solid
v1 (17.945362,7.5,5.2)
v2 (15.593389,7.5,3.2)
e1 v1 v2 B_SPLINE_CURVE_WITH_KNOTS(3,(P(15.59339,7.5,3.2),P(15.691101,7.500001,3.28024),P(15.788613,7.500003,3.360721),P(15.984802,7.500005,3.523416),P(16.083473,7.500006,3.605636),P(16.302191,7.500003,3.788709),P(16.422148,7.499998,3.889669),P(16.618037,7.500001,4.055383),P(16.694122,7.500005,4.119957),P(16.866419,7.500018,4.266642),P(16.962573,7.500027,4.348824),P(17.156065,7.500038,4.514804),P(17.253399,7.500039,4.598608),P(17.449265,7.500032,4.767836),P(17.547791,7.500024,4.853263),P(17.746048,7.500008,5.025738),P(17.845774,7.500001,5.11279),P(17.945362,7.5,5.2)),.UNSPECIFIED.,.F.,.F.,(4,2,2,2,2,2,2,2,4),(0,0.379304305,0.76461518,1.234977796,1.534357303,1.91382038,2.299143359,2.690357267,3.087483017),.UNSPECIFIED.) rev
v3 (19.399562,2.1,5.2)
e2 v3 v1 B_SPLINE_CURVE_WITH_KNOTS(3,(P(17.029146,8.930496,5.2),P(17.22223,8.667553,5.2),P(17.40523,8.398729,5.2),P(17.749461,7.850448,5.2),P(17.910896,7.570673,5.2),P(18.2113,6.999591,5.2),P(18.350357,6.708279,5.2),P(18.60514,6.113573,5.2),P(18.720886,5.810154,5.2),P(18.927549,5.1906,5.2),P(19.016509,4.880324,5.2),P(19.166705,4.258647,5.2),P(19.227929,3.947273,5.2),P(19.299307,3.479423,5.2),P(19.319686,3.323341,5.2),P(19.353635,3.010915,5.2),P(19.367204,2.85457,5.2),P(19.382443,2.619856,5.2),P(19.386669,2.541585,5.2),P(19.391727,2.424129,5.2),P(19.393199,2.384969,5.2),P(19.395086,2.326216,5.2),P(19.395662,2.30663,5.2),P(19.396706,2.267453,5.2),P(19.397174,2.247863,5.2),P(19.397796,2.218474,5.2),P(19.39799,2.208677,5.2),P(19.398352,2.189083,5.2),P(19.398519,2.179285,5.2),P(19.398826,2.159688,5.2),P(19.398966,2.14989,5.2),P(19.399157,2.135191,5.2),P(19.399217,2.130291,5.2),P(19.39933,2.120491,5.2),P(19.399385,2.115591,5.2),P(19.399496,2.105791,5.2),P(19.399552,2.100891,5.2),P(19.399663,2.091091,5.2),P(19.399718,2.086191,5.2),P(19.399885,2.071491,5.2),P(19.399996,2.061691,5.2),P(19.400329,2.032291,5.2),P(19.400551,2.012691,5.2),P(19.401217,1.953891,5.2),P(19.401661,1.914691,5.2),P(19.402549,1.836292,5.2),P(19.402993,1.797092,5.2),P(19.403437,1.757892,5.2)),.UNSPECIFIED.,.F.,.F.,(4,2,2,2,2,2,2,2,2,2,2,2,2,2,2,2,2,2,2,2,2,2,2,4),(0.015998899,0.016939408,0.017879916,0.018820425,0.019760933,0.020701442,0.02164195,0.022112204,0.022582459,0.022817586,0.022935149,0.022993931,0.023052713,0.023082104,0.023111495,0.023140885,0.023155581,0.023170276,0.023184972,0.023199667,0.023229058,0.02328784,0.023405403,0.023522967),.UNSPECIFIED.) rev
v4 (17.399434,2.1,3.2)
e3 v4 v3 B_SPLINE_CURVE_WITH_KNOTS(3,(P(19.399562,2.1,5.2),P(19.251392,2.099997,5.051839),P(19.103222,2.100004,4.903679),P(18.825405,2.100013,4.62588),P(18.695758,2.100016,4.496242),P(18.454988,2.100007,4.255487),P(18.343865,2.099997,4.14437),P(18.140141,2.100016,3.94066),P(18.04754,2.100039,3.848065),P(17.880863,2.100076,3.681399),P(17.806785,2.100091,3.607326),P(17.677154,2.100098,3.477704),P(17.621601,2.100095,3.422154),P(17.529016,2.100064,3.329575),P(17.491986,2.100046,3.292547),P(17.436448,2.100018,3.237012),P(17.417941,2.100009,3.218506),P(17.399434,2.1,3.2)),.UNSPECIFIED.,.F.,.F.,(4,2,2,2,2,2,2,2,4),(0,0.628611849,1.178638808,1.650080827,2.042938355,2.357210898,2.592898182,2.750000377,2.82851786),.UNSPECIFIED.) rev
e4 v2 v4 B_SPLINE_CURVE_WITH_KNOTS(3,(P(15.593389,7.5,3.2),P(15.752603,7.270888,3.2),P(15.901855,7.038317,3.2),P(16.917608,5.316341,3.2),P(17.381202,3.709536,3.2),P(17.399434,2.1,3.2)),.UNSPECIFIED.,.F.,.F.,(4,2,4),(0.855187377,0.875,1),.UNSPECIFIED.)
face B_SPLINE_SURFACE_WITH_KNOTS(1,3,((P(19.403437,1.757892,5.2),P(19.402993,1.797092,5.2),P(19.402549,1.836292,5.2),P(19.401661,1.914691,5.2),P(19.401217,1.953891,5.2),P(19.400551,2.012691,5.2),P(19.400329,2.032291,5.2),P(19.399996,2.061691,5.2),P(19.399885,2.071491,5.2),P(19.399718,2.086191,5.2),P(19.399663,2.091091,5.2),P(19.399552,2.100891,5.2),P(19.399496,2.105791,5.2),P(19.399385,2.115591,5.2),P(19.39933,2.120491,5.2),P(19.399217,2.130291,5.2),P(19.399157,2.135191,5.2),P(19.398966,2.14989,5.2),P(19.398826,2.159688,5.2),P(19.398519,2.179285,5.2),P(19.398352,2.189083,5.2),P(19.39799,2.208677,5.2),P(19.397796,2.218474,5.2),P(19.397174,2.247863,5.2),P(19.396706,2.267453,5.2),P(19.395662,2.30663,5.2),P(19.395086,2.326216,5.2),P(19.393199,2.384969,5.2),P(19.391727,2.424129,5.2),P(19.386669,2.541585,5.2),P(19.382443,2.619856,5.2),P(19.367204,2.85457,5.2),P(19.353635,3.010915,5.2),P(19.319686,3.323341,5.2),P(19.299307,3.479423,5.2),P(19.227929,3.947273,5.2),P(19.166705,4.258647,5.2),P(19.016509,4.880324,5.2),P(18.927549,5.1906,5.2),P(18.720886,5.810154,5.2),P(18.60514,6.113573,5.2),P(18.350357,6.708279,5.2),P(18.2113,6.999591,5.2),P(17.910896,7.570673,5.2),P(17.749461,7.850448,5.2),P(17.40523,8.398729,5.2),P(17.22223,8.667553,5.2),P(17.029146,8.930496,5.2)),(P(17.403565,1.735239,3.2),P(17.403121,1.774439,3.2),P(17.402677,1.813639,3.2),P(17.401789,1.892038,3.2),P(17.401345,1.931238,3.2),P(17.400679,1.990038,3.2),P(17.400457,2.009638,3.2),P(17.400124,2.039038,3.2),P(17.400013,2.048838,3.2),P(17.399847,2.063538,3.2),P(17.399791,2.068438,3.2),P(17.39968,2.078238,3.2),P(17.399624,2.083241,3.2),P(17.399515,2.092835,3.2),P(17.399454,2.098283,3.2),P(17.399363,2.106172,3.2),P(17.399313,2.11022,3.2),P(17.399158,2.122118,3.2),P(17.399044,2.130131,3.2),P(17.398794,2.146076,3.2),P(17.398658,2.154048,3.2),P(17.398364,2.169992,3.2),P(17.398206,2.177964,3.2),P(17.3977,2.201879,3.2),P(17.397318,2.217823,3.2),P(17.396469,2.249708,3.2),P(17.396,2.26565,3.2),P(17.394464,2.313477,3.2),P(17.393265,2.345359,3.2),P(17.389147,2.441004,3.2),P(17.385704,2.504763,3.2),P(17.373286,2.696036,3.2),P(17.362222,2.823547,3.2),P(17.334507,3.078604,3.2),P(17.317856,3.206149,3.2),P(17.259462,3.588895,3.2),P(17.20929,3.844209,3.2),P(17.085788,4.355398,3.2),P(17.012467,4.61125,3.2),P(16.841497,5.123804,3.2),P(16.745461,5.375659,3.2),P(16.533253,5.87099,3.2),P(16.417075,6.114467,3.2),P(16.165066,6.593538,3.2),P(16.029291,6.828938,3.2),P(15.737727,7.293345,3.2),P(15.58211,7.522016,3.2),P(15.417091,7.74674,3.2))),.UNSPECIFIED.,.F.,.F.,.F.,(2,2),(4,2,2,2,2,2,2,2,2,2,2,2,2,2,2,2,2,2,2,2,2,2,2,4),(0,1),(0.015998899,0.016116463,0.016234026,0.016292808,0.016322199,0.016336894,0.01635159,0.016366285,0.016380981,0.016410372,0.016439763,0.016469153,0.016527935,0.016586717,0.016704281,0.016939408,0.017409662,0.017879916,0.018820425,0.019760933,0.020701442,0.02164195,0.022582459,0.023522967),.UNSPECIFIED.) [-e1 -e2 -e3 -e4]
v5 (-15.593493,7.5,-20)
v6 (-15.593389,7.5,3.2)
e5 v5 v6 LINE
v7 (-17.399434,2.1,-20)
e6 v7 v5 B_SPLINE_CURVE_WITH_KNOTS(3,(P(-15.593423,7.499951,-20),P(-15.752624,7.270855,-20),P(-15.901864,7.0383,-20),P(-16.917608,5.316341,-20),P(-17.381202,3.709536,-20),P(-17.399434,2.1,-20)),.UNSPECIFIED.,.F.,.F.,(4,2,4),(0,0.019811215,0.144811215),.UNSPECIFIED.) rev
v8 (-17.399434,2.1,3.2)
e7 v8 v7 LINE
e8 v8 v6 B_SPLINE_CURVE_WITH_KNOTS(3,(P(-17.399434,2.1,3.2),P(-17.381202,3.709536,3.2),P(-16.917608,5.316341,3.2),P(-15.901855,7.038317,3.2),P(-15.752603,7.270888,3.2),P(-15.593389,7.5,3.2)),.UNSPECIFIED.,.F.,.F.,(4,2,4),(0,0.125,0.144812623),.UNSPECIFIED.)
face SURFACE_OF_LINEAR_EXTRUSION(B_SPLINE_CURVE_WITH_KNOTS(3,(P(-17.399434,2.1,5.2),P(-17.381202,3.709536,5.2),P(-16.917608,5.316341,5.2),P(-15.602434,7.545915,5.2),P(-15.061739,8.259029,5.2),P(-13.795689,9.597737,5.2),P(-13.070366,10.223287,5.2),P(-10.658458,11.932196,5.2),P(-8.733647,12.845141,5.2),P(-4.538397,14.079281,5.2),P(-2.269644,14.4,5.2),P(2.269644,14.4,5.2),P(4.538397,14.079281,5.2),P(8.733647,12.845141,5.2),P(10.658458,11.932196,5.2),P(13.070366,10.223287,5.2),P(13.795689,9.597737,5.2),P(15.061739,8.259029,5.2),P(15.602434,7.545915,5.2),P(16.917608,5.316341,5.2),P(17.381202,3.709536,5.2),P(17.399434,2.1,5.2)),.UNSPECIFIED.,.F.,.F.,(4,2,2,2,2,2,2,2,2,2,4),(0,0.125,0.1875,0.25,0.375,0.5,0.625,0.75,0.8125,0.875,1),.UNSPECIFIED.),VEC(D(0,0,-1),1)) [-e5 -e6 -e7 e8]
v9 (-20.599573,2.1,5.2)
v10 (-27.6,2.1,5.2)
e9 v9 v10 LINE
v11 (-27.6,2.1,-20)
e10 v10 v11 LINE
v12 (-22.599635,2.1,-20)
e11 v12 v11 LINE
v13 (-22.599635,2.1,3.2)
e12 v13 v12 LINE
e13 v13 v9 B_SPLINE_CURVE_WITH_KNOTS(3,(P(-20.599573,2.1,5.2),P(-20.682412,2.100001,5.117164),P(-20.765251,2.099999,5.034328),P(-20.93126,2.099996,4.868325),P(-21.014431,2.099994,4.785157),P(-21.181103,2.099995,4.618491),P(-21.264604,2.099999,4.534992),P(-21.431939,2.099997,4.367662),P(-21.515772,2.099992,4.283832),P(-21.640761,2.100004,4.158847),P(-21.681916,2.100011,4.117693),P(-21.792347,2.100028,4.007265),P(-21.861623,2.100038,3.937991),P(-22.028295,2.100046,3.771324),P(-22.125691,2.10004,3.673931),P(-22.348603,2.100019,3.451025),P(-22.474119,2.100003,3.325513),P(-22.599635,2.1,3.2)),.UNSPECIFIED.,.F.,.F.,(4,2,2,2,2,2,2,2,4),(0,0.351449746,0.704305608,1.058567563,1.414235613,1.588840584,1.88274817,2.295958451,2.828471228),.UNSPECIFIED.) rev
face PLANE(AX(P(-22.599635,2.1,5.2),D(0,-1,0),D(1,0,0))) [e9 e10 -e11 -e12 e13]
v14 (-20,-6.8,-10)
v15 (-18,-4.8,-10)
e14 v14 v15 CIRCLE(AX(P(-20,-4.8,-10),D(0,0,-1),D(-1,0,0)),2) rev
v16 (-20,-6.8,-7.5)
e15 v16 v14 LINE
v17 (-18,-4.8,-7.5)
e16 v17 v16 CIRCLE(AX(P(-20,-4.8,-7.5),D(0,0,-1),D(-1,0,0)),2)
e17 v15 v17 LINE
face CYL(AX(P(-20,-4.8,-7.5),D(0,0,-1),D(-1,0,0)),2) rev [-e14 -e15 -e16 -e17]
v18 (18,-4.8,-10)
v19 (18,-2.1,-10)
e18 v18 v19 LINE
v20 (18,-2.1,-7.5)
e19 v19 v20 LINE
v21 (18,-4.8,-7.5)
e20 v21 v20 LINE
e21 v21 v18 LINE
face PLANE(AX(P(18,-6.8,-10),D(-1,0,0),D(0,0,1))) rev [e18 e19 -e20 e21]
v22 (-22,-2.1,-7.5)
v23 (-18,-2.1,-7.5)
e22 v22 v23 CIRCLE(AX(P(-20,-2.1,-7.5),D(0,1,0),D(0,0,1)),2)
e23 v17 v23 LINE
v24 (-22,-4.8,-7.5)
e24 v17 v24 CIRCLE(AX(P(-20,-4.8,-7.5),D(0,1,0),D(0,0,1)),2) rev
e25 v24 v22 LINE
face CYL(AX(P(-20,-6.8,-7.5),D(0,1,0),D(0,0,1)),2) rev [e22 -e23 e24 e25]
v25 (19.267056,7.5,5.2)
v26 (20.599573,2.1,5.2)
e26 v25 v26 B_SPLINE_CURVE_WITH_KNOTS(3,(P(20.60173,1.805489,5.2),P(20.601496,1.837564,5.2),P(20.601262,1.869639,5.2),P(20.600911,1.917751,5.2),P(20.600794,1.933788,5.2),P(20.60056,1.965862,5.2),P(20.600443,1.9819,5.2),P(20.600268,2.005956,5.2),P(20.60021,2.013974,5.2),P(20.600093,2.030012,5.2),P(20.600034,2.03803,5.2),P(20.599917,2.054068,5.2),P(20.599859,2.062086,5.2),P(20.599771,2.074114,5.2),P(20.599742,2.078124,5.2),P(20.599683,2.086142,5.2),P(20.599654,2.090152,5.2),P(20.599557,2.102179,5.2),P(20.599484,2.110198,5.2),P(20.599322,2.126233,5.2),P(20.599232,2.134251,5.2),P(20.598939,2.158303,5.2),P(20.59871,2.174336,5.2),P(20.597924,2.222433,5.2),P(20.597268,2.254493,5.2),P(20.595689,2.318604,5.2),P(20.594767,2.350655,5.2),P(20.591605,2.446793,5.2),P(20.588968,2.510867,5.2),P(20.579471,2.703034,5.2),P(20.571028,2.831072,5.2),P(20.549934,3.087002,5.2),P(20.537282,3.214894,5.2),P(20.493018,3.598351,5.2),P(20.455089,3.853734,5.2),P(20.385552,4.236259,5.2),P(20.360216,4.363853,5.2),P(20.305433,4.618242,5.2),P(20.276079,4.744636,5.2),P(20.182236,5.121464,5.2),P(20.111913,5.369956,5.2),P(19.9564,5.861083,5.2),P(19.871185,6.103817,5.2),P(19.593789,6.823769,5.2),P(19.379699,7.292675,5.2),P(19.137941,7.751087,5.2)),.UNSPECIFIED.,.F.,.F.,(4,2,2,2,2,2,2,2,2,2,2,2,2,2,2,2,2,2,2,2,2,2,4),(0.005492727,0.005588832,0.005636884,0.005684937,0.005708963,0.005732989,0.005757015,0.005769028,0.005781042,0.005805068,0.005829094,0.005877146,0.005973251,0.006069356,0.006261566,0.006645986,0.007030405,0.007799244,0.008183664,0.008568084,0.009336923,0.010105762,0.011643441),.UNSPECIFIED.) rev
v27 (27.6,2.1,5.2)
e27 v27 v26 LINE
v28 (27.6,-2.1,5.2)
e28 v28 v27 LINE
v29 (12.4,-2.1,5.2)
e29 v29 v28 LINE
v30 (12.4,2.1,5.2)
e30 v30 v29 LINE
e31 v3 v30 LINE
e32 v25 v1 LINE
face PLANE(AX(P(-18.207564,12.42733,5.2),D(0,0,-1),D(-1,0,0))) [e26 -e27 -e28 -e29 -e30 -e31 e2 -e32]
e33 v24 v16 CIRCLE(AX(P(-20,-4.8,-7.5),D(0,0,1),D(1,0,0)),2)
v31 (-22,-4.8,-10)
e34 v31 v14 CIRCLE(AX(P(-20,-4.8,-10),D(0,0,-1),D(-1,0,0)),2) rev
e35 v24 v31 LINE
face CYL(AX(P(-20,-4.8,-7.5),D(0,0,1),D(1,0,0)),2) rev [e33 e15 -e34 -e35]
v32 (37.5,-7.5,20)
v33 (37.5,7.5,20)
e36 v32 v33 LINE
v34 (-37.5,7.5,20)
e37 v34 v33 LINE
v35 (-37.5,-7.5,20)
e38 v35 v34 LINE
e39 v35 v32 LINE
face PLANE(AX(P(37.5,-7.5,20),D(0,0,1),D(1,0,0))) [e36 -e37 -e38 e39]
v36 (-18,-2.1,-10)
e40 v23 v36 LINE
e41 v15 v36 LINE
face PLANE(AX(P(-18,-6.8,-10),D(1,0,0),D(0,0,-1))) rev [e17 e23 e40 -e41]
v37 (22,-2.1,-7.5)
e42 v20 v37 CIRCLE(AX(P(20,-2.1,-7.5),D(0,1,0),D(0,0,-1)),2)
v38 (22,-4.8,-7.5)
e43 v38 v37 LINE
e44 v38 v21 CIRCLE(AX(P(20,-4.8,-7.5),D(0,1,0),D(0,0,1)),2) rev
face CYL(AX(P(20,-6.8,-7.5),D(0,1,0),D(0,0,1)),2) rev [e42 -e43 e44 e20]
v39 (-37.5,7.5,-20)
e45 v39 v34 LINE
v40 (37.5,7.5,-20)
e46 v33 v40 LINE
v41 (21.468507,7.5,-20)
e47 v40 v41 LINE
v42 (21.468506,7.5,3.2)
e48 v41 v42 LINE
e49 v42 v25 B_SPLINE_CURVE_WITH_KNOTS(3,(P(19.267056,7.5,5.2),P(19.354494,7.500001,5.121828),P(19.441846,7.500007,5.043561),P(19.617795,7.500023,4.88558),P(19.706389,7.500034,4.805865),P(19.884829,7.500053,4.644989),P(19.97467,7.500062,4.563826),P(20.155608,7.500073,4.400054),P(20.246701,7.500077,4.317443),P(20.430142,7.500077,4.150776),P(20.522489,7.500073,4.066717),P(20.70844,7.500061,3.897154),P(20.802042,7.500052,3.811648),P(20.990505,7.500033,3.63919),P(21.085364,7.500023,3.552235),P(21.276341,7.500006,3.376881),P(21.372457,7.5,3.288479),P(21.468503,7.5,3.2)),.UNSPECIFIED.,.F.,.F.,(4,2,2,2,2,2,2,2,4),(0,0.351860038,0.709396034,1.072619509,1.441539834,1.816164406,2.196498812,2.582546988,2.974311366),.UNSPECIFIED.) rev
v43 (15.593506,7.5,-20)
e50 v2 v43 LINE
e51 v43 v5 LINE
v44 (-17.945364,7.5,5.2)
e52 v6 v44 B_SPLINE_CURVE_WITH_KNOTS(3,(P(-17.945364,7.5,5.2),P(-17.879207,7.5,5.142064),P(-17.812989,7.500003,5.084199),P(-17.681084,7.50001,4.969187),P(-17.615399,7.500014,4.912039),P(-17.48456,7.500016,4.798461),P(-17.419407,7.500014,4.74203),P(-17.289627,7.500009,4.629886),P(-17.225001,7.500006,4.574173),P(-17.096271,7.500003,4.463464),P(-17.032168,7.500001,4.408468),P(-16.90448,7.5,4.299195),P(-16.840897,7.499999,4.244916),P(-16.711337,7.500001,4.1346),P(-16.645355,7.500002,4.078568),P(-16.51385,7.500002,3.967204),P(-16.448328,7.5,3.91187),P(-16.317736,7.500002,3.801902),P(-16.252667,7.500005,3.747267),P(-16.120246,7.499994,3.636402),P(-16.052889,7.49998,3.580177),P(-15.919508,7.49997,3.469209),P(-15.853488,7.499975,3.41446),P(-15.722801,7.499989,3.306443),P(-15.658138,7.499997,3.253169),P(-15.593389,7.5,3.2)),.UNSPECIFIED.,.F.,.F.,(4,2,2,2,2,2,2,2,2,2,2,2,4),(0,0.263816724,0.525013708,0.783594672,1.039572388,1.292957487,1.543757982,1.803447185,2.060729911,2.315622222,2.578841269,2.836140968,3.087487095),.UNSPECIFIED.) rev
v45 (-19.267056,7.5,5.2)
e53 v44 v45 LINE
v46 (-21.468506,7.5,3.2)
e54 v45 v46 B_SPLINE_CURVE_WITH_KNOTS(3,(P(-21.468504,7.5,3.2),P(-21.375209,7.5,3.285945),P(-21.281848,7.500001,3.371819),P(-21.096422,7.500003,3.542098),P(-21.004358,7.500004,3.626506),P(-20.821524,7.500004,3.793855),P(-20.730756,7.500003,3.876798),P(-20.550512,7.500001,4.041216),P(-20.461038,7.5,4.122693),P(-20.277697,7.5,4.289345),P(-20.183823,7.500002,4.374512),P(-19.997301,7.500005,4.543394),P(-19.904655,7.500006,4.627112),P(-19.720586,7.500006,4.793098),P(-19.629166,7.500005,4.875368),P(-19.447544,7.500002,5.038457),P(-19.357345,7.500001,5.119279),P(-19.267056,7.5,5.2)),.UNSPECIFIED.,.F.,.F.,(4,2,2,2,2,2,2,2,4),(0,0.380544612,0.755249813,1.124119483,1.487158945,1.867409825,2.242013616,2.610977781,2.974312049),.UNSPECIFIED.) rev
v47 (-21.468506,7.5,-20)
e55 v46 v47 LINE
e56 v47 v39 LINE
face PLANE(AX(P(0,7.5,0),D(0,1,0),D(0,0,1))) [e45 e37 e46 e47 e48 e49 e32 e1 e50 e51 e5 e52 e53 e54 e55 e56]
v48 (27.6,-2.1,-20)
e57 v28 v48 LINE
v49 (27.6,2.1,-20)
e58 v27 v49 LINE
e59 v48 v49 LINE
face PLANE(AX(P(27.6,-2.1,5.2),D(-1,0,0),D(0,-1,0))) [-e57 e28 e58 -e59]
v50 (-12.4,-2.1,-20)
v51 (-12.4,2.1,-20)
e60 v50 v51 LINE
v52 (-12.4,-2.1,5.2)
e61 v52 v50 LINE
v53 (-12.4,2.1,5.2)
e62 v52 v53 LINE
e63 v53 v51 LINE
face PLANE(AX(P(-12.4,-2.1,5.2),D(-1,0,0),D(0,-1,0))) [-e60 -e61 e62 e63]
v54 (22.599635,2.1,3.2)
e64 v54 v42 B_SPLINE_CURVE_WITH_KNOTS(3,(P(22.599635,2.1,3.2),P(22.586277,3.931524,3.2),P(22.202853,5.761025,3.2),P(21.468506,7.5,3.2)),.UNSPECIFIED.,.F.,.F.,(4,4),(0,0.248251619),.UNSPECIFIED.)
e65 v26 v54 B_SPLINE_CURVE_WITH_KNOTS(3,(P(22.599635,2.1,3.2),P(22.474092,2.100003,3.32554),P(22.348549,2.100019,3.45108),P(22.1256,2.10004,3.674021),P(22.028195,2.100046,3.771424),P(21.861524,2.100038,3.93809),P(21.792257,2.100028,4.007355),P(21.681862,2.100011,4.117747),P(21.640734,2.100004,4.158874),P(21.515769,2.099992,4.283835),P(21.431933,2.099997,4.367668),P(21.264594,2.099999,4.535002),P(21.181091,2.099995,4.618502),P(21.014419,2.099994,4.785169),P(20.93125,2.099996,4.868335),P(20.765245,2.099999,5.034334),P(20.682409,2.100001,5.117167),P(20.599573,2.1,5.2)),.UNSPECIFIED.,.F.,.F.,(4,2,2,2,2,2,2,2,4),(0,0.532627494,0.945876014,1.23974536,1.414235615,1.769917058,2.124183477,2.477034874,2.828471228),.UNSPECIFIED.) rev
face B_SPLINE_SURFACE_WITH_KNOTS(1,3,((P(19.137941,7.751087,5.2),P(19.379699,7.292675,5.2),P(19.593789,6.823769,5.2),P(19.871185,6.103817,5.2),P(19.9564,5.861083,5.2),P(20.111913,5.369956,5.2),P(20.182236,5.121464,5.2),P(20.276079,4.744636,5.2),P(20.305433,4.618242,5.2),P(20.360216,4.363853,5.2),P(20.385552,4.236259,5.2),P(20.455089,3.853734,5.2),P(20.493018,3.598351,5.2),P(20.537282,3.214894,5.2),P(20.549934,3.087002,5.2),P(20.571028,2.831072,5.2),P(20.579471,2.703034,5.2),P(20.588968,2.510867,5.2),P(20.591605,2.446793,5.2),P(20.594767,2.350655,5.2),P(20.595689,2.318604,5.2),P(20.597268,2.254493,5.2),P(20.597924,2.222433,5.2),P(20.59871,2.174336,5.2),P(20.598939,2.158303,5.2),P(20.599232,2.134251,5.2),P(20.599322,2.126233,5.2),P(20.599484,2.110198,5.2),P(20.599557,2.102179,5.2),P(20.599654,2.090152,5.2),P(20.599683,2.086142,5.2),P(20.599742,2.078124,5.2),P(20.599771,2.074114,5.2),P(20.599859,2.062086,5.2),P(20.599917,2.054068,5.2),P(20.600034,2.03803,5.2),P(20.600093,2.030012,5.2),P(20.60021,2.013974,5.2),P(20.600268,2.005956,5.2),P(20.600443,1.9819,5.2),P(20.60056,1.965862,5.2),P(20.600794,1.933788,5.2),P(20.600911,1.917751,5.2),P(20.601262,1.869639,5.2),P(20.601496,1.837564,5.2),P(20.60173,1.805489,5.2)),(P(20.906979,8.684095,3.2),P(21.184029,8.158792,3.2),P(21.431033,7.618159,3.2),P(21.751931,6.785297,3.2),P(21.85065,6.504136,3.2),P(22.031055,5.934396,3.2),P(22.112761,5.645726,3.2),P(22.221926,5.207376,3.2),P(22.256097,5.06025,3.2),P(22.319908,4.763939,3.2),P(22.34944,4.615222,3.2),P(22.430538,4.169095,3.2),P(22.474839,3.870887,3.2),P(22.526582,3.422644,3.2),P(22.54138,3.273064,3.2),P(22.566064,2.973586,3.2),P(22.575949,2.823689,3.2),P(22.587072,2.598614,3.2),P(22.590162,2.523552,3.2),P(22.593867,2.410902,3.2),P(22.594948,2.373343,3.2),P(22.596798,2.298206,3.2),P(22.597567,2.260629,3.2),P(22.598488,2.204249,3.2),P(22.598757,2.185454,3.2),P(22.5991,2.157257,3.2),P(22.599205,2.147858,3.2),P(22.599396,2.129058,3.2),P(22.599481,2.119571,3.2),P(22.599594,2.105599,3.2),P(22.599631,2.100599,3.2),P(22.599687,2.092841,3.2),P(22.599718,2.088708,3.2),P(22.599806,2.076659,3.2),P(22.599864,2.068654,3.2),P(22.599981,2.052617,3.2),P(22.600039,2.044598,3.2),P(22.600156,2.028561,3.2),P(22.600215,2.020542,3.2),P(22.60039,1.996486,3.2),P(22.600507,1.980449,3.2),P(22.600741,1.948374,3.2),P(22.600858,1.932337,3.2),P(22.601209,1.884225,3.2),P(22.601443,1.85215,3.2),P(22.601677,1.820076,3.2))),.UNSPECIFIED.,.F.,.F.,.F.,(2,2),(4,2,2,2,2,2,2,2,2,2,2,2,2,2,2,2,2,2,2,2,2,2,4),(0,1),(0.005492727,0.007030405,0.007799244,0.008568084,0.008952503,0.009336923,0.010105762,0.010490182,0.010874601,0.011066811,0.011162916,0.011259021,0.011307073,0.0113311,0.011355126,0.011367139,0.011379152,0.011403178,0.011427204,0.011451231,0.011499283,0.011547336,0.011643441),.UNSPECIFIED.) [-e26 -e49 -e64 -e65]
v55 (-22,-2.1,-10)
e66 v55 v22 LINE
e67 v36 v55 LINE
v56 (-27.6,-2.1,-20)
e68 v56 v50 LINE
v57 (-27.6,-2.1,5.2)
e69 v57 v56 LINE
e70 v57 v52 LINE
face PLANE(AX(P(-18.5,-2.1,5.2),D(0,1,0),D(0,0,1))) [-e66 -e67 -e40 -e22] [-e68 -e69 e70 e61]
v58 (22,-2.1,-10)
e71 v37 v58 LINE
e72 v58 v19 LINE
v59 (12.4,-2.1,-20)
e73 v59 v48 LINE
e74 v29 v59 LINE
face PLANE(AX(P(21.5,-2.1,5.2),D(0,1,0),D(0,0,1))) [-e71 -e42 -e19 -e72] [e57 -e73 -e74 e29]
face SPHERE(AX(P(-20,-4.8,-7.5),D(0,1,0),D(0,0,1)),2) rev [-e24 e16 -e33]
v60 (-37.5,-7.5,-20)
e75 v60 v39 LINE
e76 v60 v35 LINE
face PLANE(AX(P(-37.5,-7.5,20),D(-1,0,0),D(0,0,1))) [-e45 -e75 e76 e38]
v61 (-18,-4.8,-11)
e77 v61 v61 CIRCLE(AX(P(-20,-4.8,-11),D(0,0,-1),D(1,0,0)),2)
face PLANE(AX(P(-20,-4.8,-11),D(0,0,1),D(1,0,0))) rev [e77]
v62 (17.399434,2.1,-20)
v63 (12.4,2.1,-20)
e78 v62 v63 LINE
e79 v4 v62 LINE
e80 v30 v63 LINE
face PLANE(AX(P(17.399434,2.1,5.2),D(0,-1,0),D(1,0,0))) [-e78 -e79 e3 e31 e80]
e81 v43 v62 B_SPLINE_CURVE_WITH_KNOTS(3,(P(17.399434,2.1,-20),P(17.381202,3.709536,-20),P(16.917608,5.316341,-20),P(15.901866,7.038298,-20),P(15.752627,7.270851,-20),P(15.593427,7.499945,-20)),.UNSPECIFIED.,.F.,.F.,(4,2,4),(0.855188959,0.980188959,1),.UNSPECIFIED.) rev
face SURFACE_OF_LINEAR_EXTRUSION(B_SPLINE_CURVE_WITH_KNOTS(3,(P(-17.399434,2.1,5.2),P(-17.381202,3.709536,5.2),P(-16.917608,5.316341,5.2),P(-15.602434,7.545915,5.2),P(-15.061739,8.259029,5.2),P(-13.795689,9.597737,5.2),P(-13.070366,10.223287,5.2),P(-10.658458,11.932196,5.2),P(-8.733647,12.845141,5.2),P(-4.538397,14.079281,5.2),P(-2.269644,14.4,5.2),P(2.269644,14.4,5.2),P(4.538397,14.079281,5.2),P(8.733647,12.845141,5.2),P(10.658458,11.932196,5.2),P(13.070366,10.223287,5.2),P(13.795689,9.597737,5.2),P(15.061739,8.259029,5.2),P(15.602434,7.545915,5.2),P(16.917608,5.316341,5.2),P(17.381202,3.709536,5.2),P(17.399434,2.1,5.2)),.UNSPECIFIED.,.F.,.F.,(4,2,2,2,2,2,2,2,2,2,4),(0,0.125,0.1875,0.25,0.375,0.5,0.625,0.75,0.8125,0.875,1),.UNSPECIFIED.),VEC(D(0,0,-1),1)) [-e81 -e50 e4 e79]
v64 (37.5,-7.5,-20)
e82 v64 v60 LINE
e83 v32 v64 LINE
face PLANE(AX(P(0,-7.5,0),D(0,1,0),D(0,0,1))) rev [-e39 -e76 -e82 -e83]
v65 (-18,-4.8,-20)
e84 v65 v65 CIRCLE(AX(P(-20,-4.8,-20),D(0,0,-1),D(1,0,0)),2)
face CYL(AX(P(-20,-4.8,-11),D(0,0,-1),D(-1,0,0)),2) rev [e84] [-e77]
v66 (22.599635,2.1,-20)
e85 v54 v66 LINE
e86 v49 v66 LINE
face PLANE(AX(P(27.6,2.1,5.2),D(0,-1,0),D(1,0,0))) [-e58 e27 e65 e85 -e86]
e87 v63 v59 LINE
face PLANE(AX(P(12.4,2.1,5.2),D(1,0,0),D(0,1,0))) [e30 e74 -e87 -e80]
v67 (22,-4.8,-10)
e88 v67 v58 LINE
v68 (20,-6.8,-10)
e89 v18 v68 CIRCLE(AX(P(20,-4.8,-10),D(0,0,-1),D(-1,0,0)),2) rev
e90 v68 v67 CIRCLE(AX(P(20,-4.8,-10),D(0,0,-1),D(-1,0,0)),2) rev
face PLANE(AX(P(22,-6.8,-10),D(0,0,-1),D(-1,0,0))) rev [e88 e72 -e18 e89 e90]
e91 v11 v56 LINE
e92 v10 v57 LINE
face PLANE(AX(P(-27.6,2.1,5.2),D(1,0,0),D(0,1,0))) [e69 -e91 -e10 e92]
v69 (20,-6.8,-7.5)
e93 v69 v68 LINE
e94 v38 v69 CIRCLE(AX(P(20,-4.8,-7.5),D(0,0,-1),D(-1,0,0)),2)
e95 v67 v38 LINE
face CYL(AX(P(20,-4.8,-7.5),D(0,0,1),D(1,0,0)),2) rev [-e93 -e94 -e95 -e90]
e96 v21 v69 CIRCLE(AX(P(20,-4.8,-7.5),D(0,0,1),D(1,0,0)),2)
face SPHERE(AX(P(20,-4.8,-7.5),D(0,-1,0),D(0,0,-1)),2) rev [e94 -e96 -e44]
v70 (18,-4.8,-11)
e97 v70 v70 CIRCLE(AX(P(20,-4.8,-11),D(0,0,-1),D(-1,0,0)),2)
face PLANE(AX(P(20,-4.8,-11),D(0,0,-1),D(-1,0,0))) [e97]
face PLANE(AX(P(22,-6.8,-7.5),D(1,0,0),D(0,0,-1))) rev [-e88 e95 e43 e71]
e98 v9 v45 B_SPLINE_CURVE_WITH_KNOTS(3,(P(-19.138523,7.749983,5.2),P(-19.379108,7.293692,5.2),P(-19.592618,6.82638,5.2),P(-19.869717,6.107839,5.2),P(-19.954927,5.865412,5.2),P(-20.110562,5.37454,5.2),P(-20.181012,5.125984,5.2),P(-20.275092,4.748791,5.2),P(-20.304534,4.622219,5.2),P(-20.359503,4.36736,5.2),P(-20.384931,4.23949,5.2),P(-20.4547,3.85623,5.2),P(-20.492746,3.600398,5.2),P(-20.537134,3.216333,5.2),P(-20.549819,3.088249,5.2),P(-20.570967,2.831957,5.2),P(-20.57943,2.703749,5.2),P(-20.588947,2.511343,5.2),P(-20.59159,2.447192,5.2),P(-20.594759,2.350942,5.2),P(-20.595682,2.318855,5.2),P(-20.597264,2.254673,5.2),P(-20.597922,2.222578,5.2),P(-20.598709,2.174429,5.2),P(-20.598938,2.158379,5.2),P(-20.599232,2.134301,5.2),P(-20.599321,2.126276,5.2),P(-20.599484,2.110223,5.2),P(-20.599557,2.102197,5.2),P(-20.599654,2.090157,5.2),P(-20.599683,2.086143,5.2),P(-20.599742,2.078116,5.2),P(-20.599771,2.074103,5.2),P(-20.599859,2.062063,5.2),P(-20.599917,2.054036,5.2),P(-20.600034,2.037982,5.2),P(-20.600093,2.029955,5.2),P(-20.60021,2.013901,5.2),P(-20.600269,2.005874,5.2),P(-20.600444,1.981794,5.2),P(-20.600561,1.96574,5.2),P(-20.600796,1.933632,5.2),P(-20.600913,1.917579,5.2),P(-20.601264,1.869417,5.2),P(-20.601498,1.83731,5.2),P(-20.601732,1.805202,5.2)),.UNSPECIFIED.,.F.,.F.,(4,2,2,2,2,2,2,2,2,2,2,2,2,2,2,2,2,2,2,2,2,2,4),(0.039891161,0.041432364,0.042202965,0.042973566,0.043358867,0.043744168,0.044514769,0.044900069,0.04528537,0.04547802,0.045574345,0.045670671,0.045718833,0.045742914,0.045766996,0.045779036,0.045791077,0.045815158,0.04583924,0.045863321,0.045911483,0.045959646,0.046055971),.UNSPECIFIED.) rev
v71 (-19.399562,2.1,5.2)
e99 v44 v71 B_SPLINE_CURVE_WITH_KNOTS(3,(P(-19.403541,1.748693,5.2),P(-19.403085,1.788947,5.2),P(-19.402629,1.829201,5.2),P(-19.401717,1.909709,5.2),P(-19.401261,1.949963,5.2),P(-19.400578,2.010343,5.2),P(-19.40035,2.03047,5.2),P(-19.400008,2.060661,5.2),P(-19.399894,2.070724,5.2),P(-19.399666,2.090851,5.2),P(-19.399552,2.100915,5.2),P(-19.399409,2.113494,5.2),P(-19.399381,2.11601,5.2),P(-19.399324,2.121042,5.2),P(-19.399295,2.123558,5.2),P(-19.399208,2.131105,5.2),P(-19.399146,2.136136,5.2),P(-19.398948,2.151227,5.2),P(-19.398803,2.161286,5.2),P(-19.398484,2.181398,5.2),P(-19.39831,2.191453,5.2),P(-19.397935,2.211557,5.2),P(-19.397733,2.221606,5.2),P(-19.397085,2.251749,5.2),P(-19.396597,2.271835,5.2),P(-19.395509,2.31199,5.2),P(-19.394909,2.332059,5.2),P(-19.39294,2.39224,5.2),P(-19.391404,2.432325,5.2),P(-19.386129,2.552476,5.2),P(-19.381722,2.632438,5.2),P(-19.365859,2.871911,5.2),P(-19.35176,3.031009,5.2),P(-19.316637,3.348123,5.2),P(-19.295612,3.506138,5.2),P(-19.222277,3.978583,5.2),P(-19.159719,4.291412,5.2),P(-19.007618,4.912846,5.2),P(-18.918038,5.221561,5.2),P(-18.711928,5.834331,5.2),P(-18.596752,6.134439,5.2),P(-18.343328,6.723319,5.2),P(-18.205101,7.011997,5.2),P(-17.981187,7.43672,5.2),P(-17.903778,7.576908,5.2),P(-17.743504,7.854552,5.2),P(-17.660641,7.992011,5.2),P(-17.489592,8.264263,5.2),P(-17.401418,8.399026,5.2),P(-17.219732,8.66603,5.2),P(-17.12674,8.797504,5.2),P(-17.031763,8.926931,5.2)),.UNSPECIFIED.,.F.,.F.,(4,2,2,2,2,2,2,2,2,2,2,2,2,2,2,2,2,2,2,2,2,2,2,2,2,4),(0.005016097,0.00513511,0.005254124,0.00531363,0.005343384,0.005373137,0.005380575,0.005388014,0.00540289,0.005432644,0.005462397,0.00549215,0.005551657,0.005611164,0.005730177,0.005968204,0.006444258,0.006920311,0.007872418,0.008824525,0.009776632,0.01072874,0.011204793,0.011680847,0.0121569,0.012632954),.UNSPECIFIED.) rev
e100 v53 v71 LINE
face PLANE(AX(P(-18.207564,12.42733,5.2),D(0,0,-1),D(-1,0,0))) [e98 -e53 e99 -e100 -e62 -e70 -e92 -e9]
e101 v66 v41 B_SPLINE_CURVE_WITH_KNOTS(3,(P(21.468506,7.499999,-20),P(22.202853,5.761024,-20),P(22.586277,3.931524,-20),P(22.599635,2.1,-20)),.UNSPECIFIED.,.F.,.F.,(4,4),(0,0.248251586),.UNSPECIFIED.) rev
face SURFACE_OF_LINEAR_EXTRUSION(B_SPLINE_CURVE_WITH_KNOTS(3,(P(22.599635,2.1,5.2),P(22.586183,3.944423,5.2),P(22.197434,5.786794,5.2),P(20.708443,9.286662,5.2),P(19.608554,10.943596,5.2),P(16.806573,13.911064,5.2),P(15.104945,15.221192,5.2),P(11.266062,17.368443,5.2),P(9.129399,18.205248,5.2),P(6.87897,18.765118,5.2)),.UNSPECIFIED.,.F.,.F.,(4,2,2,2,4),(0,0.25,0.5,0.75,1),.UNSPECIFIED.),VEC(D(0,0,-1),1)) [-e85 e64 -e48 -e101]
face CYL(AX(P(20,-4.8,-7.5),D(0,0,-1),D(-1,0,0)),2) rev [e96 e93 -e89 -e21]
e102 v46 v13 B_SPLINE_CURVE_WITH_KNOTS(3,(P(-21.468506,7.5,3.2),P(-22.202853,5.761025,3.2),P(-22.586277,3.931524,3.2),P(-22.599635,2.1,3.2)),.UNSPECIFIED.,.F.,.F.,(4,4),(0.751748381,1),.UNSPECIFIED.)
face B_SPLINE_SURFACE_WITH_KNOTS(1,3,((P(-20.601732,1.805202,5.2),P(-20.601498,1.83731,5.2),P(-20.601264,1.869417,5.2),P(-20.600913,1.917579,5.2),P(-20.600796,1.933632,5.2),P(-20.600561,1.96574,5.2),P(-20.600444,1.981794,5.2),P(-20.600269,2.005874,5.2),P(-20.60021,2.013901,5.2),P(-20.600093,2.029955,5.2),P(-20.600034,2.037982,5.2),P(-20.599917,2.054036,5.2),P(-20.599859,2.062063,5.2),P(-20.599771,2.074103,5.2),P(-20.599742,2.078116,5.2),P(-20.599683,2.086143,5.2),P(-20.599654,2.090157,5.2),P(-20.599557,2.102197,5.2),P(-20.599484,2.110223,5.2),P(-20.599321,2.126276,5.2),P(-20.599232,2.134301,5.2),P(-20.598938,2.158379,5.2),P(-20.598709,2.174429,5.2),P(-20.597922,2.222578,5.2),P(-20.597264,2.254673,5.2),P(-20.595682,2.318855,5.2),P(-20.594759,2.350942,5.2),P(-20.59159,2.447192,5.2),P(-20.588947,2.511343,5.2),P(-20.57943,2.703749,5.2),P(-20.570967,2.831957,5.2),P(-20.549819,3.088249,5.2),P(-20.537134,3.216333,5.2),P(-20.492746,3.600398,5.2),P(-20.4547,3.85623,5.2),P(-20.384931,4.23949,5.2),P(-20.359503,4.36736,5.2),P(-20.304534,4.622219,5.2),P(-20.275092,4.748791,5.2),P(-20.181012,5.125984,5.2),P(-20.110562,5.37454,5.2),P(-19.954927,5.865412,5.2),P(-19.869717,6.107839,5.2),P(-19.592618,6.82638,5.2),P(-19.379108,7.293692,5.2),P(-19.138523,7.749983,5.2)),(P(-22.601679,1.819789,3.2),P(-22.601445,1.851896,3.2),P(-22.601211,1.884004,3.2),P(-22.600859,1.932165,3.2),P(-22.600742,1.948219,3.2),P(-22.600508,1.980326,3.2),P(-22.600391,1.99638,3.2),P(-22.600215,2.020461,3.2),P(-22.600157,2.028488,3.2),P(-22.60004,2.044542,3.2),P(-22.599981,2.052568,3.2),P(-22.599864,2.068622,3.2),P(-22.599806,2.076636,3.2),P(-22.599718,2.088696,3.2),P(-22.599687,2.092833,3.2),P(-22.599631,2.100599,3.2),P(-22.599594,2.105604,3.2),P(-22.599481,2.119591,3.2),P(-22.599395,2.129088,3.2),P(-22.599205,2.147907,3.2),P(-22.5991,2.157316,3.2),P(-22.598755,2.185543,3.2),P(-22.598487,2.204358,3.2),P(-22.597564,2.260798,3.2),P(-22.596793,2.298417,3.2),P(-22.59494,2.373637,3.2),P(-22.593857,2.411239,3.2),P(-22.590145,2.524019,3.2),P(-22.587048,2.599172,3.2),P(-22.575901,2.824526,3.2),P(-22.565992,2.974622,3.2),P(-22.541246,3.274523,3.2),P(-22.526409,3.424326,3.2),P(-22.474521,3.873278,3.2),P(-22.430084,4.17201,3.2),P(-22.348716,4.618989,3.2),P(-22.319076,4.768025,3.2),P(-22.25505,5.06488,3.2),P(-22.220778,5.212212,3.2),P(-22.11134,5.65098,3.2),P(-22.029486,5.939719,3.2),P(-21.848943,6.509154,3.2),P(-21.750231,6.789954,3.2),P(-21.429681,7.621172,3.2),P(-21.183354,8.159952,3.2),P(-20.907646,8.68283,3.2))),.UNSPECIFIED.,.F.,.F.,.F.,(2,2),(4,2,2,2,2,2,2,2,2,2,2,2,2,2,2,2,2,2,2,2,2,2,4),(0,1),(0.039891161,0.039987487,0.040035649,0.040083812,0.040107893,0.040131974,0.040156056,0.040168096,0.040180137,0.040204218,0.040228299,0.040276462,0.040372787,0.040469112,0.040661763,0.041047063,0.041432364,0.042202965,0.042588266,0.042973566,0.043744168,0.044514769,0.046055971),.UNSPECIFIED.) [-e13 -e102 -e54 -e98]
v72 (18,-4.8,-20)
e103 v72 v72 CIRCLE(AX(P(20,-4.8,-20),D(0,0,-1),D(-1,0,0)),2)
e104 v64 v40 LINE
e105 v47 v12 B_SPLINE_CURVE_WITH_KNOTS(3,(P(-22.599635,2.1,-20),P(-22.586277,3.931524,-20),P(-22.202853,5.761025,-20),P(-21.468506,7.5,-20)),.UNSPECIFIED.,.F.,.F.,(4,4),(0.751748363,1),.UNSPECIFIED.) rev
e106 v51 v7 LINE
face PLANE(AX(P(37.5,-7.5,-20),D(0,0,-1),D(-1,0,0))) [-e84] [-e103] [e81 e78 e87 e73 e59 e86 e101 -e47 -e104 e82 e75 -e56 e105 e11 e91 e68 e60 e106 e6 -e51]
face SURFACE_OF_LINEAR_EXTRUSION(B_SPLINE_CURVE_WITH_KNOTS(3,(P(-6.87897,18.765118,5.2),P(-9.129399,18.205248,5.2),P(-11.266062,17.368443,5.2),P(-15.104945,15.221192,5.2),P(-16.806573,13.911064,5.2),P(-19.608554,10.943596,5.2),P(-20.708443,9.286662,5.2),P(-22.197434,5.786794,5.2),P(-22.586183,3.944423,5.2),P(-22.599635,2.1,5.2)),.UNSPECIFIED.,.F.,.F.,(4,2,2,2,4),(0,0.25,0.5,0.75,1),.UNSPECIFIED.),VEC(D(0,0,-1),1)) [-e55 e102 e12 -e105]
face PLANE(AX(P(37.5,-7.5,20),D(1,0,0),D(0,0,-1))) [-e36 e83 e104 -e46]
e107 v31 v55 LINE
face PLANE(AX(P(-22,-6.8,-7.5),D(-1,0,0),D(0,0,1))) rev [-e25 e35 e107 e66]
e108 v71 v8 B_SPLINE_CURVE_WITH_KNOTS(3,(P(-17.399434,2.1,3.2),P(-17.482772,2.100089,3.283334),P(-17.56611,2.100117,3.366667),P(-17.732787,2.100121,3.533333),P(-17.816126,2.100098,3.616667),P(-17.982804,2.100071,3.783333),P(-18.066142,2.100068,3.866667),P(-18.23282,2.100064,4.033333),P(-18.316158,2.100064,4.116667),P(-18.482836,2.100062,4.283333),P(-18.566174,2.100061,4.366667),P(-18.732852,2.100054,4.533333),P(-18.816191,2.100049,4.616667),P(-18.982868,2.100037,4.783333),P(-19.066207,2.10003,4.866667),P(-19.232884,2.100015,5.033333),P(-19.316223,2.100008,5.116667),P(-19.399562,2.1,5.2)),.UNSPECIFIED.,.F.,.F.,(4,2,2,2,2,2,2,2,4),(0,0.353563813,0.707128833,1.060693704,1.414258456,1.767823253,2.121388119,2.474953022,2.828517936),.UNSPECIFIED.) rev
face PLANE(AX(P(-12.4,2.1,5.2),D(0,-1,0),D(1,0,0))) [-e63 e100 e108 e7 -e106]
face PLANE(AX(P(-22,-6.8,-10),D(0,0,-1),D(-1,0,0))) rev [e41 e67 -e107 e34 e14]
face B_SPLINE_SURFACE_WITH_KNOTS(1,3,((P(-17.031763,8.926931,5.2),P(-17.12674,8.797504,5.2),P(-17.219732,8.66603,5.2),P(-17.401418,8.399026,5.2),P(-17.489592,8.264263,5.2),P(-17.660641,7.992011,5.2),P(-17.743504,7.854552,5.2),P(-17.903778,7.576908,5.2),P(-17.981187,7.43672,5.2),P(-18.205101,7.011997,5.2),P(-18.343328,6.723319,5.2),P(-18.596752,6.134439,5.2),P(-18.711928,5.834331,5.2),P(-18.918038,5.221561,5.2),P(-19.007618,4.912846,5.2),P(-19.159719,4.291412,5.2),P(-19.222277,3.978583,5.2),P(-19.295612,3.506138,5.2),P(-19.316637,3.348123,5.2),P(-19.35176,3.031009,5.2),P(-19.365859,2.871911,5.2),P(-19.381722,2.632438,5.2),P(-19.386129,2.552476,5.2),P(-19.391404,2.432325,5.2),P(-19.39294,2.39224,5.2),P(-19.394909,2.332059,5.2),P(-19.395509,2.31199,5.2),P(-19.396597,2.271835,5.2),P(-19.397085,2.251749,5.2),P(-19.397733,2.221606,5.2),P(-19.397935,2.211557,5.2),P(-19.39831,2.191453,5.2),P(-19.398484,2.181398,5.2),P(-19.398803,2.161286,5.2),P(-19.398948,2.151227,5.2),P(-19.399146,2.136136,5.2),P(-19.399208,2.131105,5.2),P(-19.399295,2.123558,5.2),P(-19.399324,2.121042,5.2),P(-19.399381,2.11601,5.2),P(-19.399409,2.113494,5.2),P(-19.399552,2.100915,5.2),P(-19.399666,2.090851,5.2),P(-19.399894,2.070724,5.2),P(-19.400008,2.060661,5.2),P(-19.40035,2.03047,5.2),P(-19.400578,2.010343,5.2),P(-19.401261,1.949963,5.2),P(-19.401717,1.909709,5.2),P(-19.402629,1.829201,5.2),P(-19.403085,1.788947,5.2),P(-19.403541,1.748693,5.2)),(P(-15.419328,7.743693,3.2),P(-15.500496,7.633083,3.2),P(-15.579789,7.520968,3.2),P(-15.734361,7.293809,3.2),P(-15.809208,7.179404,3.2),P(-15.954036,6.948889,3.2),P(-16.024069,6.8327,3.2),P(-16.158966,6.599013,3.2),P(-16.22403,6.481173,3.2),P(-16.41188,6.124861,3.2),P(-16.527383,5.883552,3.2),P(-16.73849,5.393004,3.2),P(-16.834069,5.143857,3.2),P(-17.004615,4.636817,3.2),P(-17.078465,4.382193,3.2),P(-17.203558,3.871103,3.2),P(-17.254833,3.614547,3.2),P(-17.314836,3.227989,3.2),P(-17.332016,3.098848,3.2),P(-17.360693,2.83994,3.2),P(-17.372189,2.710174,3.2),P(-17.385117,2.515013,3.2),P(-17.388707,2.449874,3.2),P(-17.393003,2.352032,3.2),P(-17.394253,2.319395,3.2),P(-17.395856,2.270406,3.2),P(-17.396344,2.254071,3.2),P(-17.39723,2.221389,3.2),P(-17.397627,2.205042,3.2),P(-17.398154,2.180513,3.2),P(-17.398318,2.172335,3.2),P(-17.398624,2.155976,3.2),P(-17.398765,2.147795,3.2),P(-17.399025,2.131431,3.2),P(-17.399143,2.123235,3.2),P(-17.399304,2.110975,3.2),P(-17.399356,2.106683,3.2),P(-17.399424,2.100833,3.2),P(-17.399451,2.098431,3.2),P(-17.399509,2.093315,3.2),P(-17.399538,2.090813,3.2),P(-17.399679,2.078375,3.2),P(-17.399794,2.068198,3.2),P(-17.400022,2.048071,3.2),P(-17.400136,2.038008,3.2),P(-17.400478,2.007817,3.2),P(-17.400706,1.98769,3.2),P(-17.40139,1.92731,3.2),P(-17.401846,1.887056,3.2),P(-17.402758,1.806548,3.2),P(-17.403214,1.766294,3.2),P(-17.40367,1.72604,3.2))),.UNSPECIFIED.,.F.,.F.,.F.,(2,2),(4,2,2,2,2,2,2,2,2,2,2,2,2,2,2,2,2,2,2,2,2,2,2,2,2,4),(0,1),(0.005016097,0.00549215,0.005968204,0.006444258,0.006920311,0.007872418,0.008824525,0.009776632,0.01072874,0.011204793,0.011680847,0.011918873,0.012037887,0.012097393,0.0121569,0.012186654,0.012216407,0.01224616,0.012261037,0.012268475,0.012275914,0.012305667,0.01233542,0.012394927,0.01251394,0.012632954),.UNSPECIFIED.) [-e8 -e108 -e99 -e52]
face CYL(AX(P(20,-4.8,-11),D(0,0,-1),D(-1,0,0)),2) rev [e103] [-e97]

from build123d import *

# Parameters (mm, degrees)
BOSS_EXTRUDE1_DEPTH      = 7.5
BOSS_EXTRUDE1_DEPTH_BACK = 7.5
SKETCH1_W                = 75
SKETCH1_H                = 40
CUT_EXTRUDE1_DEPTH       = 5.2
CUT_EXTRUDE1_DEPTH_BACK  = 20
CHAMFER1_SIZE            = 2
SKETCH3_R                = 2
CUT_EXTRUDE2_DEPTH       = 9
CUT_EXTRUDE3_DEPTH       = 4.7
FILLET1_R                = 2


with BuildPart() as part:
    # Sketch1 → Boss-Extrude1 (new, two sides: drawn at the far end of the back side and taken through both)
    with BuildSketch(Plane(origin=(0, 0, 0), x_dir=(1, 0, 0), z_dir=(0, 1, 0)).offset(-BOSS_EXTRUDE1_DEPTH_BACK)):
        Rectangle(SKETCH1_W, SKETCH1_H)
    extrude(amount=BOSS_EXTRUDE1_DEPTH + BOSS_EXTRUDE1_DEPTH_BACK)

    # Sketch2 → Cut-Extrude1 (cut, two sides: drawn at the far end of the back side and taken through both)
    with BuildSketch(Plane.XY.offset(-CUT_EXTRUDE1_DEPTH_BACK)):
        with BuildLine():
            Line((6.87897019, 18.765118011), (-6.87897019, 18.765118011))
            add(Edge.make_bspline(
                [(-6.87897019, 18.765118011), (-9.129399026, 18.205247728), (-11.266061827, 17.3684432), (-15.104945109, 15.221192023), (-16.806572871, 13.91106443), (-19.608554315, 10.943595702), (-20.708442739, 9.286661987), (-22.197433977, 5.786794286), (-22.586183082, 3.944422776), (-22.599635329, 2.1)],
                knots=[0, 0, 0, 0, 0.25, 0.25, 0.5, 0.5, 0.75, 0.75, 1, 1, 1, 1], degree=3))
            Line((-22.599635329, 2.1), (-27.6, 2.1))
            Line((-27.6, 2.1), (-27.6, -2.1))
            Line((-27.6, -2.1), (-21.5, -2.1))
            Line((-21.5, -2.1), (-18.5, -2.1))
            Line((-18.5, -2.1), (-12.4, -2.1))
            Line((-12.4, -2.1), (-12.4, 2.1))
            Line((-12.4, 2.1), (-17.399433648, 2.1))
            add(Edge.make_bspline(
                [(-17.399433648, 2.1), (-17.381202069, 3.709535833), (-16.917608437, 5.316341272), (-15.60243407, 7.545915267), (-15.061738812, 8.259029365), (-13.79568918, 9.597737471), (-13.070365792, 10.223287356), (-10.658457879, 11.932196217), (-8.73364722, 12.845140962), (-4.538397278, 14.079281106), (-2.269643886, 14.4), (2.269643886, 14.4), (4.538397278, 14.079281106), (8.73364722, 12.845140962), (10.658457879, 11.932196217), (13.070365792, 10.223287356), (13.79568918, 9.597737471), (15.061738812, 8.259029365), (15.60243407, 7.545915267), (16.917608437, 5.316341272), (17.381202069, 3.709535833), (17.399433648, 2.1)],
                knots=[0, 0, 0, 0, 0.125, 0.125, 0.1875, 0.1875, 0.25, 0.25, 0.375, 0.375, 0.5, 0.5, 0.625, 0.625, 0.75, 0.75, 0.8125, 0.8125, 0.875, 0.875, 1, 1, 1, 1], degree=3))
            Line((17.399433648, 2.1), (12.4, 2.1))
            Line((12.4, 2.1), (12.4, -2.1))
            Line((12.4, -2.1), (18.5, -2.1))
            Line((18.5, -2.1), (21.5, -2.1))
            Line((21.5, -2.1), (27.6, -2.1))
            Line((27.6, -2.1), (27.6, 2.1))
            Line((27.6, 2.1), (22.599635329, 2.1))
            add(Edge.make_bspline(
                [(22.599635329, 2.1), (22.586183082, 3.944422776), (22.197433977, 5.786794286), (20.708442739, 9.286661987), (19.608554315, 10.943595702), (16.806572871, 13.91106443), (15.104945109, 15.221192023), (11.266061827, 17.3684432), (9.129399026, 18.205247728), (6.87897019, 18.765118011)],
                knots=[0, 0, 0, 0, 0.25, 0.25, 0.5, 0.5, 0.75, 0.75, 1, 1, 1, 1], degree=3))
        make_face()
    extrude(amount=CUT_EXTRUDE1_DEPTH + CUT_EXTRUDE1_DEPTH_BACK, mode=Mode.SUBTRACT)

    # Chamfer1
    chamfer1_edges = [part.edges().sort_by_distance(p)[0] for p in [
        (-16.904241207, 4.934871199, 5.2),
        (-22.30006804, 4.855503871, 5.2),
        (22.30006804, 4.855503871, 5.2),
        (16.904241207, 4.934871199, 5.2),
    ]]
    chamfer(chamfer1_edges, length=CHAMFER1_SIZE)

    # Sketch3 → Cut-Extrude2 (cut)
    with BuildSketch(Plane(origin=(0, 0, -20), x_dir=(-1, 0, 0), z_dir=(0, 0, -1))):
        with Locations((-20, -4.8)):
            Circle(SKETCH3_R)
        with Locations(Location((20, -4.8, 0), (0, 0, 180))):
            Circle(SKETCH3_R)
    extrude(amount=-CUT_EXTRUDE2_DEPTH, mode=Mode.SUBTRACT)

    # Sketch4 → Cut-Extrude3 (cut)
    with BuildSketch(Plane(origin=(0, -2.1, 0), x_dir=(1, 0, 0), z_dir=(0, 1, 0))):
        with BuildLine():
            Line((-22, 7.5), (-22, 10))
            Line((-22, 10), (-18, 10))
            Line((-18, 10), (-18, 7.5))
            ThreePointArc((-18, 7.5), (-20, 5.5), (-22, 7.5))
        make_face()
        with BuildLine():
            Line((18, 10), (18, 7.5))
            ThreePointArc((18, 7.5), (20, 5.5), (22, 7.5))
            Line((22, 7.5), (22, 10))
            Line((22, 10), (18, 10))
        make_face()
    extrude(amount=-CUT_EXTRUDE3_DEPTH, mode=Mode.SUBTRACT)

    # Fillet1
    fillet1_edges = [part.edges().sort_by_distance(p)[0] for p in [
        (-22, -6.8, -8.75),
        (-18, -6.8, -8.75),
        (-20, -6.8, -5.5),
        (18, -6.8, -8.75),
        (22, -6.8, -8.75),
        (20, -6.8, -5.5),
    ]]
    fillet(fillet1_edges, radius=FILLET1_R - 0.0001)  # a hair under: the kernel refuses the full size


solid = part.part
